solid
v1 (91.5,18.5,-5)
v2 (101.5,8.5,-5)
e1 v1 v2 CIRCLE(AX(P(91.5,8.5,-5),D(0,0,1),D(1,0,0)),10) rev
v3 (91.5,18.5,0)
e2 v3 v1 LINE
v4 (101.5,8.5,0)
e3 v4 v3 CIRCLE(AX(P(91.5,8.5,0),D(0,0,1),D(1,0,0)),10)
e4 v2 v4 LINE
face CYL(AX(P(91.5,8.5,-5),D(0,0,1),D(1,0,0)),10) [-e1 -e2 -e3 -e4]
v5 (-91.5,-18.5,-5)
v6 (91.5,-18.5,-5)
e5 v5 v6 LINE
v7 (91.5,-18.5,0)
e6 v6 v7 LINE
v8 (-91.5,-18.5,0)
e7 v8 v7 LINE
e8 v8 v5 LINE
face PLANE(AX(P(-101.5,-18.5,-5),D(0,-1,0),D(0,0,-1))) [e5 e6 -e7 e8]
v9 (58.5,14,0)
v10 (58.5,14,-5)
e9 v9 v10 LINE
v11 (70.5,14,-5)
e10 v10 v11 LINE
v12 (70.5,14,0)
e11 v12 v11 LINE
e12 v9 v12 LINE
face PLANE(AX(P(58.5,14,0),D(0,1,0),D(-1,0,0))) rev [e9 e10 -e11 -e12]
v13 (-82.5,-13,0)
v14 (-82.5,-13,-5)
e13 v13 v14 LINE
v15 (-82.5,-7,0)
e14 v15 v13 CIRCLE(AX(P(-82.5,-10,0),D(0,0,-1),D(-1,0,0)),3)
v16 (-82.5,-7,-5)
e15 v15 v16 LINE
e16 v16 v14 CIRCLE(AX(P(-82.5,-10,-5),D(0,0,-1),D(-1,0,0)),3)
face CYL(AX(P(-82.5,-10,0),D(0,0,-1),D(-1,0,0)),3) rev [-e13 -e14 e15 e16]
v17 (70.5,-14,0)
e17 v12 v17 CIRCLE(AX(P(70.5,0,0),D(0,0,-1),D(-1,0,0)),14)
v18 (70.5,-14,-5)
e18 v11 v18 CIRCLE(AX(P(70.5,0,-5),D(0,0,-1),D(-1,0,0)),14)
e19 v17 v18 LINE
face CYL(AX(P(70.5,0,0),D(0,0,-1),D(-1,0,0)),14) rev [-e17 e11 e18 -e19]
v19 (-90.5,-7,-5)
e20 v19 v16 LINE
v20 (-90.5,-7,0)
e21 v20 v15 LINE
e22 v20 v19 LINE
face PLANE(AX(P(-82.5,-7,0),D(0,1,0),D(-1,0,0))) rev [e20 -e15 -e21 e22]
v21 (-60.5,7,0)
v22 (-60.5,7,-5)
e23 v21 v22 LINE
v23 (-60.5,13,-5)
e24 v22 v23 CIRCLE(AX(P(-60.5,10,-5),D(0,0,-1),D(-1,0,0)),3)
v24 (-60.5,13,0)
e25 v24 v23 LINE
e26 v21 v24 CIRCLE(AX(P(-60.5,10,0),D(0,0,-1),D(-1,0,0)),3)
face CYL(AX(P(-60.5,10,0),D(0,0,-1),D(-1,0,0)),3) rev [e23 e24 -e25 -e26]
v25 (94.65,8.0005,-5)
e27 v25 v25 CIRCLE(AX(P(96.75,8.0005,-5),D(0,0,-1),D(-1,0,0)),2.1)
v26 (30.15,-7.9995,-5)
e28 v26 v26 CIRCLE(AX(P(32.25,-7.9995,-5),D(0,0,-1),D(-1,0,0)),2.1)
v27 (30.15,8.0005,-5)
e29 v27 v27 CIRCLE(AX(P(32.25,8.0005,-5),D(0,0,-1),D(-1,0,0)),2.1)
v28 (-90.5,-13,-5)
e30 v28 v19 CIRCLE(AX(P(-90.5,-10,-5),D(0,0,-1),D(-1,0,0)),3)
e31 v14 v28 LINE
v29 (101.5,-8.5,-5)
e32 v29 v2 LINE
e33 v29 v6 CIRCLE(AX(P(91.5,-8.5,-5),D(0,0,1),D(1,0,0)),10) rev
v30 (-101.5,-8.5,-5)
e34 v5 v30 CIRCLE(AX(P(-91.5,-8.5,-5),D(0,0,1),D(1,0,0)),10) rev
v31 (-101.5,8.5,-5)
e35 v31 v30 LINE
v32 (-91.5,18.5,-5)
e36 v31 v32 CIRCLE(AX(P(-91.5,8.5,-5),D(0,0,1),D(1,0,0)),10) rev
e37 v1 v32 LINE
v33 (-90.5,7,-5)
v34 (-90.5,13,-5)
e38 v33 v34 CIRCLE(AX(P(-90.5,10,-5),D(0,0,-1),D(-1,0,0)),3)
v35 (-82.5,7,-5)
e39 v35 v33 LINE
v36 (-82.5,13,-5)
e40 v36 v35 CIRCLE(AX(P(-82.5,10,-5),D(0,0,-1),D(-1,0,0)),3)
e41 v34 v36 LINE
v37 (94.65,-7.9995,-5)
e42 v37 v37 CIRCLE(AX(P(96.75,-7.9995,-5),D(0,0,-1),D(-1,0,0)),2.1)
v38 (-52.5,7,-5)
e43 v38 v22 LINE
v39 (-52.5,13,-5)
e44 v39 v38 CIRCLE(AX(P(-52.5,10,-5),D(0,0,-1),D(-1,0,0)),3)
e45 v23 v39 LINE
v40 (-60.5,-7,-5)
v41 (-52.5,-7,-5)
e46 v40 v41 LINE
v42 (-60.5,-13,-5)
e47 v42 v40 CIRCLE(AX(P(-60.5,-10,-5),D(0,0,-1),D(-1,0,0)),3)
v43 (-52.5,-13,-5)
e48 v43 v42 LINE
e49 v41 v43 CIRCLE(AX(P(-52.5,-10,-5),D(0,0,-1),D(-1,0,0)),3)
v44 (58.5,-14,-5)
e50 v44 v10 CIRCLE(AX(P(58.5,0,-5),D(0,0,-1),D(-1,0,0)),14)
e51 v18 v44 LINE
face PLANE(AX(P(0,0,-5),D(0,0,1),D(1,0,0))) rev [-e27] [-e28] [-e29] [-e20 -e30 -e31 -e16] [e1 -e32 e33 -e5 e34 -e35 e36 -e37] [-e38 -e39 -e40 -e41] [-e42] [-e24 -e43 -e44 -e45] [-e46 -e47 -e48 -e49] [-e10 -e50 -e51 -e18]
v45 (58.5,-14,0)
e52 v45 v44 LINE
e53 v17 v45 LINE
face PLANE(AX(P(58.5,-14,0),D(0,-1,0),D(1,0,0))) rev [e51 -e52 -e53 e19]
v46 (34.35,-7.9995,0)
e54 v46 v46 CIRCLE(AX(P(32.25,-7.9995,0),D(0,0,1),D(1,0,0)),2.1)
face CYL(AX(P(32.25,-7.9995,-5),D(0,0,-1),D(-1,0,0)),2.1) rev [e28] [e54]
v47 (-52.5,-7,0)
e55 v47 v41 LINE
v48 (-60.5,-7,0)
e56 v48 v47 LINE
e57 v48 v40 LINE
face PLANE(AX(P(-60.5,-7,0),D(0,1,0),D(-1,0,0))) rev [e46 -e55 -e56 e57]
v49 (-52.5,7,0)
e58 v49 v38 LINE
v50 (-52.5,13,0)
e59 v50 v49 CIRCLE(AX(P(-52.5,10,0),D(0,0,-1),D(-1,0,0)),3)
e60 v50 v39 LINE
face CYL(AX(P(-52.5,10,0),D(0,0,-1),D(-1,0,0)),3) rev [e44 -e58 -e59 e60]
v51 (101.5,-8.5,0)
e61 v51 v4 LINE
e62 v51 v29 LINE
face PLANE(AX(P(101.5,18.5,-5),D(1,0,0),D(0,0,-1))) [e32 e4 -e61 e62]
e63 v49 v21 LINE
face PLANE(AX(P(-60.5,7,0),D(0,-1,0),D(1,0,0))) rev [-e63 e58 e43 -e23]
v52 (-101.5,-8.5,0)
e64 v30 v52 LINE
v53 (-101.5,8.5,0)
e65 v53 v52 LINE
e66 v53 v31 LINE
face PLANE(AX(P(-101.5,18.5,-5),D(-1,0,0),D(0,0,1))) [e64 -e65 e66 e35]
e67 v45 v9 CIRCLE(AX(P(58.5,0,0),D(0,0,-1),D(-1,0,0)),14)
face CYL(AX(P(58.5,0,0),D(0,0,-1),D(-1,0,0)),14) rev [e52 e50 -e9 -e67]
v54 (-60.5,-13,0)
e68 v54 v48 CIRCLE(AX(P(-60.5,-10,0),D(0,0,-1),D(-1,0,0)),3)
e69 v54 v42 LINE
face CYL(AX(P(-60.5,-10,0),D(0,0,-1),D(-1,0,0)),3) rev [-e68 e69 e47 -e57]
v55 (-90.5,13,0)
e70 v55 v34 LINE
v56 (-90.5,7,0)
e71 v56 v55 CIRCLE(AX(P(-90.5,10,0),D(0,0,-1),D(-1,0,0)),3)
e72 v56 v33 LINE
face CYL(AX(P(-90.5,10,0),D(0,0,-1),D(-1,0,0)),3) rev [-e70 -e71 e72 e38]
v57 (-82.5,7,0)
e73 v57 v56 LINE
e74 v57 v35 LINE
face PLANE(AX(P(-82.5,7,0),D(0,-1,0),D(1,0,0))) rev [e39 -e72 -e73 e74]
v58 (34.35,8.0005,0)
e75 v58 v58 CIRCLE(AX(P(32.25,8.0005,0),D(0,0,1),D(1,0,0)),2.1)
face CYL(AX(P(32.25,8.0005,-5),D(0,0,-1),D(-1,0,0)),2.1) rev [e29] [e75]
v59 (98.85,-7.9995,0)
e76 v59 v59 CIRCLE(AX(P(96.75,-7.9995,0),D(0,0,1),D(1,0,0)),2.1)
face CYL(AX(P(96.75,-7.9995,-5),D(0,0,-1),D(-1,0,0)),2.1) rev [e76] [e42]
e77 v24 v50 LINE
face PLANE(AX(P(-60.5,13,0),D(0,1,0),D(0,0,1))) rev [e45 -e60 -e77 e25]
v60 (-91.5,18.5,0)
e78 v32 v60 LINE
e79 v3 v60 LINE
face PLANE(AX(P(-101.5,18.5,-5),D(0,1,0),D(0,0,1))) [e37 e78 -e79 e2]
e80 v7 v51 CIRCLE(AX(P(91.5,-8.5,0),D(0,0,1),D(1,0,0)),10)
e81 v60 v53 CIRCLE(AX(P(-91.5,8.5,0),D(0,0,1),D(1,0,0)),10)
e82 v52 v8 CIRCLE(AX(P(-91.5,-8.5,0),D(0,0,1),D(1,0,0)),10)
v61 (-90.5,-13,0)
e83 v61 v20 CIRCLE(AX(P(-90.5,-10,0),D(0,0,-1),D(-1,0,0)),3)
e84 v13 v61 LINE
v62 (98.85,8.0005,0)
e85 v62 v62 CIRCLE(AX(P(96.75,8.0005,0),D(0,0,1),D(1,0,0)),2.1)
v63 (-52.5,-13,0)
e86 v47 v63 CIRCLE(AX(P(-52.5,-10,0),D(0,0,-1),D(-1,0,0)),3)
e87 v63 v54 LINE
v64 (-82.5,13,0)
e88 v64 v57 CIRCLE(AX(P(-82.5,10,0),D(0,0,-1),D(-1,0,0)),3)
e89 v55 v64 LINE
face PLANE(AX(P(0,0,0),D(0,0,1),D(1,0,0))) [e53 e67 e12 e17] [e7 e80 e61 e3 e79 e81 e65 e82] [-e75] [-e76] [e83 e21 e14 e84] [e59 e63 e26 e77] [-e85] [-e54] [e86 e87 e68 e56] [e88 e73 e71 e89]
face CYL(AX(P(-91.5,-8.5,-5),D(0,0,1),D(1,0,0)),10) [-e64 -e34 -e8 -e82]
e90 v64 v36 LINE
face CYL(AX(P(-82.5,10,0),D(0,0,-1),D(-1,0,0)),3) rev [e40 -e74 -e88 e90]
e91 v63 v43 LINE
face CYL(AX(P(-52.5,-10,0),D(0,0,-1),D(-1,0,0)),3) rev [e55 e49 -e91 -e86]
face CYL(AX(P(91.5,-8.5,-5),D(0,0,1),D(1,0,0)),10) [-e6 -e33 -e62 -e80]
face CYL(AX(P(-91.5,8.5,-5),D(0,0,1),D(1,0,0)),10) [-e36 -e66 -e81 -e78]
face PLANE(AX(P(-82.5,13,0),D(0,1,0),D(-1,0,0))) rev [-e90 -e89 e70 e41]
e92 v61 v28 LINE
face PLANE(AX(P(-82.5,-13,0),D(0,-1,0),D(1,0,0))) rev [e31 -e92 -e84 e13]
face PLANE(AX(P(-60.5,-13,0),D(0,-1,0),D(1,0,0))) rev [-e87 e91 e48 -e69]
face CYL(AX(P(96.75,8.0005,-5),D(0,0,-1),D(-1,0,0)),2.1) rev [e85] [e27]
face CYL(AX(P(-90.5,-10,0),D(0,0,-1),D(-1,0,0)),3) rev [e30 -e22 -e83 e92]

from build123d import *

# Parameters (mm, degrees)
SKETCH_1_W             = 203
SKETCH_1_H             = 37
SM_BASE_FLANGE_1_DEPTH = 5
FILLET_1_R             = 10
CUT_EXTRUDE_1_DEPTH    = 10
CUT_EXTRUDE_2_DEPTH    = 10
HOLE_WIZARD_M5_1_D     = 4.2
HOLE_WIZARD_M5_1_DEPTH = 12.4
HOLE_WIZARD_M5_1_TIP   = 1.2618073


# Sheet-metal steps are written as plain solids
with BuildPart() as part:
    # Sketch 1 → 基体-法兰1 (new body)
    with BuildSketch(Plane.XY):
        Rectangle(SKETCH_1_W, SKETCH_1_H)
    extrude(amount=-SM_BASE_FLANGE_1_DEPTH)

    # 圆角1
    fillet_1_edges = [part.edges().sort_by_distance(p)[0] for p in [
        (101.5, -18.5, -2.5),
        (-101.5, -18.5, -2.5),
        (-101.5, 18.5, -2.5),
        (101.5, 18.5, -2.5),
    ]]
    fillet(fillet_1_edges, radius=FILLET_1_R)

    # Sketch 2 → 切除-拉伸1 (cut)
    with BuildSketch(Plane(origin=(0, 0, -5), x_dir=(-1, 0, 0), z_dir=(0, 0, -1))):
        with BuildLine():
            Line((-58.5, -14), (-70.5, -14))
            ThreePointArc((-70.5, -14), (-84.5, 0), (-70.5, 14))
            Line((-70.5, 14), (-58.5, 14))
            ThreePointArc((-58.5, 14), (-44.5, 0), (-58.5, -14))
        make_face()
    extrude(amount=-CUT_EXTRUDE_1_DEPTH, mode=Mode.SUBTRACT)

    # 草图3 → 切除-拉伸2 (cut)
    with BuildSketch(Plane(origin=(0, 0, -5), x_dir=(-1, 0, 0), z_dir=(0, 0, -1))):
        with BuildLine():
            Line((60.5, -13), (52.5, -13))
            ThreePointArc((52.5, -13), (49.5, -10), (52.5, -7))
            Line((52.5, -7), (60.5, -7))
            ThreePointArc((60.5, -7), (63.5, -10), (60.5, -13))
        make_face()
        with BuildLine():
            Line((60.5, 7), (52.5, 7))
            ThreePointArc((52.5, 7), (49.5, 10), (52.5, 13))
            Line((52.5, 13), (60.5, 13))
            ThreePointArc((60.5, 13), (63.5, 10), (60.5, 7))
        make_face()
        with BuildLine():
            Line((82.5, 13), (90.5, 13))
            ThreePointArc((90.5, 13), (93.5, 10), (90.5, 7))
            Line((90.5, 7), (82.5, 7))
            ThreePointArc((82.5, 7), (79.5, 10), (82.5, 13))
        make_face()
        with BuildLine():
            Line((82.5, -7), (90.5, -7))
            ThreePointArc((90.5, -7), (93.5, -10), (90.5, -13))
            Line((90.5, -13), (82.5, -13))
            ThreePointArc((82.5, -13), (79.5, -10), (82.5, -7))
        make_face()
    extrude(amount=-CUT_EXTRUDE_2_DEPTH, mode=Mode.SUBTRACT)

    # M5 螺纹孔1
    with Locations(Plane(origin=(0, 0, -5), x_dir=(-1, 0, 0), z_dir=(0, 0, -1))):
        with Locations((-96.75, -7.9995), (-96.75, 8.0005), (-32.25, 8.0005), (-32.25, -7.9995)):
            Hole(HOLE_WIZARD_M5_1_D / 2, depth=HOLE_WIZARD_M5_1_DEPTH)
            with Locations((0, 0, -(HOLE_WIZARD_M5_1_DEPTH + HOLE_WIZARD_M5_1_TIP / 2))):  # 118° drill point
                Cone(0, HOLE_WIZARD_M5_1_D / 2, HOLE_WIZARD_M5_1_TIP, mode=Mode.SUBTRACT)


solid = part.part
